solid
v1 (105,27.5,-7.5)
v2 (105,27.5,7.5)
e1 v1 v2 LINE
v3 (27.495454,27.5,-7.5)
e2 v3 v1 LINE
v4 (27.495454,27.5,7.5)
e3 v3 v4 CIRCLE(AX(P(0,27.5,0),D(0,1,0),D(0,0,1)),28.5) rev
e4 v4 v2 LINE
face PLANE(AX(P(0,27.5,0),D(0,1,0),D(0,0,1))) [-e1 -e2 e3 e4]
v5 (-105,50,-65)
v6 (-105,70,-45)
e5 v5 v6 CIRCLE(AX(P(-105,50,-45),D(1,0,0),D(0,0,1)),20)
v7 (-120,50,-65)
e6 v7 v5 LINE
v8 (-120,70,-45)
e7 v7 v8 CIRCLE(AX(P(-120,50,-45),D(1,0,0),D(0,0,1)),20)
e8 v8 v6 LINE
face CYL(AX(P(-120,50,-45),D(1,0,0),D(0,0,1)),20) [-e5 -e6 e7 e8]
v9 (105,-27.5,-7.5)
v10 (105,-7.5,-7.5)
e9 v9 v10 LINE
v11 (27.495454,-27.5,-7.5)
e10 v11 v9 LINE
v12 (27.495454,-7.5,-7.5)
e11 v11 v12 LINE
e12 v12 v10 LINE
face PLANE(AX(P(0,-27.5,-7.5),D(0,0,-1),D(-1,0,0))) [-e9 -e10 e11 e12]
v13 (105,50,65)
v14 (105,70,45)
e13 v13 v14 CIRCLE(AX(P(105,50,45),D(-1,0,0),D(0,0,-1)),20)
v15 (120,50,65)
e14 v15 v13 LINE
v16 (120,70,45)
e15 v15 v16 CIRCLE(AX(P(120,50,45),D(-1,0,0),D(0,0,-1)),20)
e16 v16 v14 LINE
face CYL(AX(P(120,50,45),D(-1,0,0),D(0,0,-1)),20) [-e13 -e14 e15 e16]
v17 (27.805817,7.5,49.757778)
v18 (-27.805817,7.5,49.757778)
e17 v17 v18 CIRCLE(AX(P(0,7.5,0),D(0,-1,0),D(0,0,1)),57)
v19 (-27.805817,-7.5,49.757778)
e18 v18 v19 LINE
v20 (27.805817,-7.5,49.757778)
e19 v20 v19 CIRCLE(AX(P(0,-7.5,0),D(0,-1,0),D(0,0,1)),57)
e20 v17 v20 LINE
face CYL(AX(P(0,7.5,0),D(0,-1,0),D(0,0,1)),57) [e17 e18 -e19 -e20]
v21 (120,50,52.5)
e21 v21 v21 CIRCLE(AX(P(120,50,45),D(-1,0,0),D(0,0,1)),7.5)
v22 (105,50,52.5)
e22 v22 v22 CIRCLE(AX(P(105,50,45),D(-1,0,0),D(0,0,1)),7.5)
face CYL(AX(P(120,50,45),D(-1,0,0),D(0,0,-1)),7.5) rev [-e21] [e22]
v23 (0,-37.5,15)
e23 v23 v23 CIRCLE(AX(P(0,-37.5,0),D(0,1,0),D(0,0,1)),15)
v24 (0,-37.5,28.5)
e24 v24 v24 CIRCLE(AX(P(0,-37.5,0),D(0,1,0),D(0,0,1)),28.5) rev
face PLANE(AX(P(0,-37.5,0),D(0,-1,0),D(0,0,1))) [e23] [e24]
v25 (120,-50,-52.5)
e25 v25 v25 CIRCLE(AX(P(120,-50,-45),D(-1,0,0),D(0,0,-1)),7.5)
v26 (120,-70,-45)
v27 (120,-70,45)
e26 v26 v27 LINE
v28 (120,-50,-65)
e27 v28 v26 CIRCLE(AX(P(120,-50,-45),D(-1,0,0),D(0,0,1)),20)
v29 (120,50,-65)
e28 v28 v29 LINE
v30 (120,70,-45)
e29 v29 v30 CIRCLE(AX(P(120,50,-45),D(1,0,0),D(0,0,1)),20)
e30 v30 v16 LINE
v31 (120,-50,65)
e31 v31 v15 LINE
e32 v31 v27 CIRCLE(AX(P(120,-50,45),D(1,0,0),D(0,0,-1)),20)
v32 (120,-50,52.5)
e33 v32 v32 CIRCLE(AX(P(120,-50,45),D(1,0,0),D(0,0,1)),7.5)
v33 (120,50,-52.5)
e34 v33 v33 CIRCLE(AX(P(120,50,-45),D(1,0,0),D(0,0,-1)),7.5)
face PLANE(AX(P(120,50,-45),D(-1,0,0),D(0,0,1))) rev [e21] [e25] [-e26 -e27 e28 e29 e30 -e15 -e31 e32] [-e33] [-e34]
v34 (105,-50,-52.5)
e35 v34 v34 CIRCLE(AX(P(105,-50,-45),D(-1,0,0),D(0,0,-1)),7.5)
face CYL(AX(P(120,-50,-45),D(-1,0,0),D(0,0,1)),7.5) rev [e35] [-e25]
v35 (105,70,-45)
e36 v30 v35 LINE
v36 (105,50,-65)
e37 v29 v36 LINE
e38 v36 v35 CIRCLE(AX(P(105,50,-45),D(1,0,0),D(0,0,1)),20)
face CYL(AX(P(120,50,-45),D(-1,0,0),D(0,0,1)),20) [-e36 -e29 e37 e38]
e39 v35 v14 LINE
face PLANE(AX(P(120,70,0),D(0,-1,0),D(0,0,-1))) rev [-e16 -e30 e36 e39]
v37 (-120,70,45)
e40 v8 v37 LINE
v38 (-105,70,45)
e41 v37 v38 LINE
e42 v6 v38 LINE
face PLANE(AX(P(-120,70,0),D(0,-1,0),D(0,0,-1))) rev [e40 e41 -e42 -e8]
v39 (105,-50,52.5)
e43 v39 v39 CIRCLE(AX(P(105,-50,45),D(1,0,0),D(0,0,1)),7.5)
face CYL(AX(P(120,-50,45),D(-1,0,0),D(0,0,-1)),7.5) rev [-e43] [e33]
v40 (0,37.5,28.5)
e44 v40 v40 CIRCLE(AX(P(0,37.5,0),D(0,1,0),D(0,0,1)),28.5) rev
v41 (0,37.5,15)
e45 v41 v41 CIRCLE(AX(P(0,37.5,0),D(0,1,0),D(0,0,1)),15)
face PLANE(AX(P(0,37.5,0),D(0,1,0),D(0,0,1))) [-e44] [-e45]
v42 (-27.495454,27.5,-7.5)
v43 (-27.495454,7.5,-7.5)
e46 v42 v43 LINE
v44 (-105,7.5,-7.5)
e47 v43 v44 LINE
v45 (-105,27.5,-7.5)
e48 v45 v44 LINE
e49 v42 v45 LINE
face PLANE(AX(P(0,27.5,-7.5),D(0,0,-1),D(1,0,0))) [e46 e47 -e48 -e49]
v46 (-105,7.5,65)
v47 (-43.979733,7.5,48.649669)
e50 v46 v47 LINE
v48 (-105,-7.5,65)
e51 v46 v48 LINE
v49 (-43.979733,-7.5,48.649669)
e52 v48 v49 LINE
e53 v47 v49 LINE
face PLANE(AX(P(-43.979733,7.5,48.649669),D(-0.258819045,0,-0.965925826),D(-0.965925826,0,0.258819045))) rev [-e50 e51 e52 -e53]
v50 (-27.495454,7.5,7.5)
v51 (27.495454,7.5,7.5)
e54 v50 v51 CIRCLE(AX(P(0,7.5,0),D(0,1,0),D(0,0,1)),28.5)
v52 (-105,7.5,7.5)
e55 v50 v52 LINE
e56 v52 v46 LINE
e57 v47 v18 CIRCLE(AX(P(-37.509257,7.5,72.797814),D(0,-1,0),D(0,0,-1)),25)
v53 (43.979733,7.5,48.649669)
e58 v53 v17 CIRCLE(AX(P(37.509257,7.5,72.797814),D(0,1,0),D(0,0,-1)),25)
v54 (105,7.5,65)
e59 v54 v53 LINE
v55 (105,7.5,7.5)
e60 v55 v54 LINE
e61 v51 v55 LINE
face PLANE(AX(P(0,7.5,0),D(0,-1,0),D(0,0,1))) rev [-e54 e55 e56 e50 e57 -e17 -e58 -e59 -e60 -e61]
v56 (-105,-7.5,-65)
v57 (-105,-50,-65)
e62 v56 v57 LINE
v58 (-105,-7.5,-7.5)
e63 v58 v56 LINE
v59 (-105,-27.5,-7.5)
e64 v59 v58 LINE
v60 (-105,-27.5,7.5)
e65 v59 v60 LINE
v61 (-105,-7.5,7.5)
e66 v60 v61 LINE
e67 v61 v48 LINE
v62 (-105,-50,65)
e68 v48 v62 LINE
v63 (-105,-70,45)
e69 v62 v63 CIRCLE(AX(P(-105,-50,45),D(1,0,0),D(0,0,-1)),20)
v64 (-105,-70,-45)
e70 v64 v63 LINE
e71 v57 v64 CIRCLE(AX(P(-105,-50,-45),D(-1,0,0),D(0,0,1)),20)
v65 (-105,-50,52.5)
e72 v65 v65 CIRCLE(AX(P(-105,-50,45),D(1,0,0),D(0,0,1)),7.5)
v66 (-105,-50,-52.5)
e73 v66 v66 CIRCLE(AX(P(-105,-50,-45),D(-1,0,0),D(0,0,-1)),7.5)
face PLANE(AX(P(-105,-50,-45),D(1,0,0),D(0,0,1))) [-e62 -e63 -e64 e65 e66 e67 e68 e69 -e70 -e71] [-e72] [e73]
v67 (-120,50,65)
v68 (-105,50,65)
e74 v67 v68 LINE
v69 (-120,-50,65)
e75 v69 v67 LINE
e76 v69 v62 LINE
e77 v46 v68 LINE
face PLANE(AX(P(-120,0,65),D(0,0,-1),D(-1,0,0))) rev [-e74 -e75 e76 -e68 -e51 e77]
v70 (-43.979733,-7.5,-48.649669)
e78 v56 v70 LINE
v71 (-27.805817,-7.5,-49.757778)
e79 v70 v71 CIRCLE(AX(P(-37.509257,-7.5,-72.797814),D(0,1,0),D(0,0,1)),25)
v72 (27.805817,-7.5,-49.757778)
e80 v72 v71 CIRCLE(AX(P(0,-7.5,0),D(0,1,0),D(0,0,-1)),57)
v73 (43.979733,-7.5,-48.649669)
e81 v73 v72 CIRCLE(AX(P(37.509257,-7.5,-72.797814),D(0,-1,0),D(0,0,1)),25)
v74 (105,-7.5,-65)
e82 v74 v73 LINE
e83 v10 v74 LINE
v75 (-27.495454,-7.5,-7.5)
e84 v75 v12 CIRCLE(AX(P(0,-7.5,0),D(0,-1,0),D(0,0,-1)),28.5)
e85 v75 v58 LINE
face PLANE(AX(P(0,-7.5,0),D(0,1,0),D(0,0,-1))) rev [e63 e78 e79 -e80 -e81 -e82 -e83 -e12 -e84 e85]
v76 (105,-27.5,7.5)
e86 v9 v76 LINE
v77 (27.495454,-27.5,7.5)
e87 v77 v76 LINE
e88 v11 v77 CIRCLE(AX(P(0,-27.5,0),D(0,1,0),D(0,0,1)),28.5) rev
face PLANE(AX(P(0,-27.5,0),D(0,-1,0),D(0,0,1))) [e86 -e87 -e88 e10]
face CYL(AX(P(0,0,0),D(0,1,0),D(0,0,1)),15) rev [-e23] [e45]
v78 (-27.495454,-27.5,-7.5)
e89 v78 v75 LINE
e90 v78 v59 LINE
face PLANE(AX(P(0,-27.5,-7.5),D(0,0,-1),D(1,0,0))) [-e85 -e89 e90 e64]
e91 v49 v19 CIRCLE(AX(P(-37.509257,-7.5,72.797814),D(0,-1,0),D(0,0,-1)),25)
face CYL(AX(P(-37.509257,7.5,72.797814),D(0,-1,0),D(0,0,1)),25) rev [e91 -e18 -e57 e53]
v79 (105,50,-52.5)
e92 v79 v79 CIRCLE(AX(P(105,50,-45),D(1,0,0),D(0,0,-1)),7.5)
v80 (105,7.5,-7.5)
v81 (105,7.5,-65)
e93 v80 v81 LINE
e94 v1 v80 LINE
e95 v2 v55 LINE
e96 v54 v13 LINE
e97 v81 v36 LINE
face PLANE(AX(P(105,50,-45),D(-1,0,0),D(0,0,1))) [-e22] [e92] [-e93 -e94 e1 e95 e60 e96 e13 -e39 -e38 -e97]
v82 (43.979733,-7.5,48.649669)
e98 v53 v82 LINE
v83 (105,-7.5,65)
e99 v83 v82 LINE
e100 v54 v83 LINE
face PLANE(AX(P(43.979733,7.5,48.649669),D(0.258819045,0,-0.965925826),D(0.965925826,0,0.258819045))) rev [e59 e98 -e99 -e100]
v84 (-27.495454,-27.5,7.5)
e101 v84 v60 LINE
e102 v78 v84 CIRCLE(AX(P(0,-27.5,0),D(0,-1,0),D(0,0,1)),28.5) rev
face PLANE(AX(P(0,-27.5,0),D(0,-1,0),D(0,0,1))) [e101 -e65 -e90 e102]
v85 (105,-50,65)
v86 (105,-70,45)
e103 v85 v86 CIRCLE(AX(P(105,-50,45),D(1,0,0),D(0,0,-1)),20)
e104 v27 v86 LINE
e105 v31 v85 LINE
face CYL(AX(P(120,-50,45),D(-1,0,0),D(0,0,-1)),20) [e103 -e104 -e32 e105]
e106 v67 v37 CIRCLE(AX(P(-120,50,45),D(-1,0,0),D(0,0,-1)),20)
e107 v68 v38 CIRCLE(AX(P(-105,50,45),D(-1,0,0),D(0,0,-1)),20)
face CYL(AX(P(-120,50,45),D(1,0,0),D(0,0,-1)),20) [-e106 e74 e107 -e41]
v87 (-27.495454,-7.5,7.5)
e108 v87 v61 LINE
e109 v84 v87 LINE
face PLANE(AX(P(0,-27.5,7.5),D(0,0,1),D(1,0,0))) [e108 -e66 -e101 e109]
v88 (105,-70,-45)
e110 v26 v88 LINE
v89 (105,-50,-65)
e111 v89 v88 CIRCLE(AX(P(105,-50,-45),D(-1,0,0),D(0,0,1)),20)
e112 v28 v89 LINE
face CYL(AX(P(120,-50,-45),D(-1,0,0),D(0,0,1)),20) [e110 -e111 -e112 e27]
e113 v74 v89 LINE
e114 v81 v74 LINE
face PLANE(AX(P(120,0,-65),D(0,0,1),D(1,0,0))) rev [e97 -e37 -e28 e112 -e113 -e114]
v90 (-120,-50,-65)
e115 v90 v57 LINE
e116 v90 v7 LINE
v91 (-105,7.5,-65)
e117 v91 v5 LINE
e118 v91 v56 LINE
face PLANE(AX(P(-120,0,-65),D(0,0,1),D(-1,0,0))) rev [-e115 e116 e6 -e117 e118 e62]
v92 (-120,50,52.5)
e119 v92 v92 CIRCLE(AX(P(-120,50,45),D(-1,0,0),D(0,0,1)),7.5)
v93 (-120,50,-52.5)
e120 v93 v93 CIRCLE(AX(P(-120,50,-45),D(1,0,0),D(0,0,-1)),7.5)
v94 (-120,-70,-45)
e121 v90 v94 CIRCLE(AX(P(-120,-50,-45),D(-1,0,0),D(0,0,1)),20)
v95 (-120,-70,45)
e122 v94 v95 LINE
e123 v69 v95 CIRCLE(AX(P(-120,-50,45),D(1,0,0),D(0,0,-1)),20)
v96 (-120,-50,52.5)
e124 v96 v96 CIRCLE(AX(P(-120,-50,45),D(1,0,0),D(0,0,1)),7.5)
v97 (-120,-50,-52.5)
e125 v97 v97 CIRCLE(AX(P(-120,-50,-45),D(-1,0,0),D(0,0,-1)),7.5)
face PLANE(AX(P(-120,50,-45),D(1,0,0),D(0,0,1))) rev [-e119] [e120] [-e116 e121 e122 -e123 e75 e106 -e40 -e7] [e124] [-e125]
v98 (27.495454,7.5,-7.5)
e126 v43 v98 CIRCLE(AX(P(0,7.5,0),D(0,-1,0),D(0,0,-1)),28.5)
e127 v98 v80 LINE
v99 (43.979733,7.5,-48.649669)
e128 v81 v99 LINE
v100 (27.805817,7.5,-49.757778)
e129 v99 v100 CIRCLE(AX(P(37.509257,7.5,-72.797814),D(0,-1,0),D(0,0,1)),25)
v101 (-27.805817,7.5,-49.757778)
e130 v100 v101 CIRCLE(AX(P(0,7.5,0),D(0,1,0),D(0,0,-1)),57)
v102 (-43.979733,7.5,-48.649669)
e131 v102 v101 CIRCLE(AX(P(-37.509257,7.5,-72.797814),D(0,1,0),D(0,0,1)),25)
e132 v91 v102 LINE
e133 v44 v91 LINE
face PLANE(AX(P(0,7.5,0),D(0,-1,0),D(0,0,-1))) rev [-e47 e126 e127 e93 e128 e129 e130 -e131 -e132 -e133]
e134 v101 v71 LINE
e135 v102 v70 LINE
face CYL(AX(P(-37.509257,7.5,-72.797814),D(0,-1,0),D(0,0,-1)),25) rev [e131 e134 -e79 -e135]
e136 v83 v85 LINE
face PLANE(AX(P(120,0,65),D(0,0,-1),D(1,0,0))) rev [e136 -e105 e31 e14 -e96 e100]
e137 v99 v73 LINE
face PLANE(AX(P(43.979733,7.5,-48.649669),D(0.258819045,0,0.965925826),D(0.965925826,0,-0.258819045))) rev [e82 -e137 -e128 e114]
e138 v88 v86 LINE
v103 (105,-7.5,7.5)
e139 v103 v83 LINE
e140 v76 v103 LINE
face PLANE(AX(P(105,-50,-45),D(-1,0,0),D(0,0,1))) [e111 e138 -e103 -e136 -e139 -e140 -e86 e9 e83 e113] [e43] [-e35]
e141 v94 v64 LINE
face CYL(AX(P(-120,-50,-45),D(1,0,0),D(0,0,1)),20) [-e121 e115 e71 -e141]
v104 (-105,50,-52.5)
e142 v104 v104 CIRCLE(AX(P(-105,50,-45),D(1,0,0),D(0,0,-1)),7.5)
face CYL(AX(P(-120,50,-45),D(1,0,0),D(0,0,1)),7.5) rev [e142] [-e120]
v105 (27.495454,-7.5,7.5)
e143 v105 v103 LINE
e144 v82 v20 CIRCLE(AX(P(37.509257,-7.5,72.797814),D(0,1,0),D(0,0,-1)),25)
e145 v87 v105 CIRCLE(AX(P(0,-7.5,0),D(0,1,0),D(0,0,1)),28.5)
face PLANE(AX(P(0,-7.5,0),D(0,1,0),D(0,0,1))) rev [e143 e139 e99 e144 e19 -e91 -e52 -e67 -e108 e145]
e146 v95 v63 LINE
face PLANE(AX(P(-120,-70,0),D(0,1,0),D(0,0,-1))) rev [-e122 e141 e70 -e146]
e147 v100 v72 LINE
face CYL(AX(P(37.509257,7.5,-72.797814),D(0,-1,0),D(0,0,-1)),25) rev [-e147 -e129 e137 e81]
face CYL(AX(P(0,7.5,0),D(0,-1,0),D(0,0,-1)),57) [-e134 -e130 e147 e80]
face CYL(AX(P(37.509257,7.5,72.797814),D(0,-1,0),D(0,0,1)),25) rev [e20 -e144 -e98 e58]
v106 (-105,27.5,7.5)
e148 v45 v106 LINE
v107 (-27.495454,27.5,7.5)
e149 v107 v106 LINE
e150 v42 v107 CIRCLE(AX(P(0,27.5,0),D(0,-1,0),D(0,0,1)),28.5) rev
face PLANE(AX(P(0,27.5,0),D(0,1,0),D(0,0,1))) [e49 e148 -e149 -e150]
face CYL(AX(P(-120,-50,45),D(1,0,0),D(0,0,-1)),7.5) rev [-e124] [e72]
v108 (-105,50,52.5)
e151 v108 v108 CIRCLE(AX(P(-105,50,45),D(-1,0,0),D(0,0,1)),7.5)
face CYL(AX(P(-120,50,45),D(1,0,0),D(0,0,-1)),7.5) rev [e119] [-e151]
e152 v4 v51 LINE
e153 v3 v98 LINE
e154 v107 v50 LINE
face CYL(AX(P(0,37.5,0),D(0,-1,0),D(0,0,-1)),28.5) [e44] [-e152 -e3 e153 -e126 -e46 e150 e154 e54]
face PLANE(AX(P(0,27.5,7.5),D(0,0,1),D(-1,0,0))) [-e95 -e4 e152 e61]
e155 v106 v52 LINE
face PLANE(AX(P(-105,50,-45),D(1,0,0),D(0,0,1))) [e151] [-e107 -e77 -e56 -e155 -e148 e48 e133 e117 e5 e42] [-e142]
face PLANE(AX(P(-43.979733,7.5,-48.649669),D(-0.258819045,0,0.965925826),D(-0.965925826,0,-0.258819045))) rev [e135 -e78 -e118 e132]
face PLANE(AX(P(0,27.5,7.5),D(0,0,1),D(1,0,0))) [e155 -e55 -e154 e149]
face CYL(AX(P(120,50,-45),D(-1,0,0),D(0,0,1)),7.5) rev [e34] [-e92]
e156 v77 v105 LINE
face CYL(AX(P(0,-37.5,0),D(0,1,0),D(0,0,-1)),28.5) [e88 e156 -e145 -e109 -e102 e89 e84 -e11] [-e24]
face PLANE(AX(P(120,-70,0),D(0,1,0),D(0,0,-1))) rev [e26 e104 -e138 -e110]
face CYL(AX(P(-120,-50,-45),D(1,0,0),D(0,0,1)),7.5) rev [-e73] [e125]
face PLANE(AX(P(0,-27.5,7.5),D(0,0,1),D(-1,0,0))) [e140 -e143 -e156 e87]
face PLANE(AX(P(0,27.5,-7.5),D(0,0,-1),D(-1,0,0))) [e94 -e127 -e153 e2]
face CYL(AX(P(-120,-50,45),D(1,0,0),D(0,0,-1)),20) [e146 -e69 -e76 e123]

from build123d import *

# Parameters (mm, degrees)
BOSS_EXTRUDE1_DEPTH   = 7.5
CUT_EXTRUDE1_DEPTH    = 124.718430317
BOSS_EXTRUDE2_START   = 37.5
BOSS_EXTRUDE2_DEPTH   = 37.5
BOSS_EXTRUDE3_START   = 27.5
BOSS_EXTRUDE3_DEPTH   = 27.5
SKETCH4_R             = 7.5
BOSS_EXTRUDE4_DEPTH   = 15
MIRROR1_DEPTH         = 27.5
MIRROR1_2_DEPTH       = 7.5
MIRROR1_START         = 27.5
MIRROR1_3_OUTLINE_W   = 15
MIRROR1_3_OUTLINE_H   = 130
MIRROR1_3_OUTLINE_H_2 = 65
MIRROR1_3_DEPTH       = 14.9999999
MIRROR1_4_DEPTH       = 10
MIRROR1_START_2       = -120
MIRROR1_5_OUTLINE_R   = 7.5
MIRROR1_5_DEPTH       = 15
MIRROR1_START_3       = 105
MIRROR1_6_OUTLINE_R   = 7.5
MIRROR1_6_DEPTH       = 15


with BuildPart() as part:
    # Sketch1 → Boss-Extrude1 (new body)
    with BuildSketch(Plane(origin=(0, 0, 0), x_dir=(1, 0, 0), z_dir=(0, 1, 0))):
        with BuildLine():
            Line((43.979733232, 48.649668798), (105, 65))
            Line((105, 65), (105, 0))
            Line((105, 0), (0, 0))
            Line((0, 0), (0, 57))
            ThreePointArc((0, 57), (14.366743308, 55.159737914), (27.805817387, 49.757778482))
            ThreePointArc((27.805817387, 49.757778482), (35.800459234, 47.856282629), (43.979733232, 48.649668798))
        make_face()
    extrude(amount=BOSS_EXTRUDE1_DEPTH)

    # Sketch2 → Cut-Extrude1 (cut, through all)
    with BuildSketch(Plane(origin=(0, 7.5, 0), x_dir=(1, 0, 0), z_dir=(0, 1, 0))):
        with BuildLine():
            Line((0, 15), (0, 0))
            Line((0, 0), (15, 0))
            ThreePointArc((15, 0), (10.606601718, 10.606601718), (0, 15))
        make_face()
    extrude(amount=-CUT_EXTRUDE1_DEPTH, mode=Mode.SUBTRACT)

    # Sketch3 → Boss-Extrude2 (add)
    with BuildSketch(Plane(origin=(0, 0, 0), x_dir=(1, 0, 0), z_dir=(0, 1, 0)).offset(BOSS_EXTRUDE2_START)):
        with BuildLine():
            ThreePointArc((28.5, 0), (28.247747201, 3.783487555), (27.49545417, 7.5))
            ThreePointArc((27.49545417, 7.5), (17.298843892, 22.649503306), (0, 28.5))
            Line((0, 28.5), (0, 15))
            ThreePointArc((0, 15), (10.606601718, 10.606601718), (15, 0))
            Line((15, 0), (28.5, 0))
        make_face()
    extrude(amount=-BOSS_EXTRUDE2_DEPTH)

    # Sketch3<4> → Boss-Extrude3 (add)
    with BuildSketch(Plane(origin=(0, 0, 0), x_dir=(1, 0, 0), z_dir=(0, 1, 0)).offset(BOSS_EXTRUDE3_START)):
        with BuildLine():
            Line((105, 7.5), (27.49545417, 7.5))
            ThreePointArc((27.49545417, 7.5), (28.247747201, 3.783487555), (28.5, 0))
            Line((28.5, 0), (105, 0))
            Line((105, 0), (105, 7.5))
        make_face()
    extrude(amount=-BOSS_EXTRUDE3_DEPTH)

    # Sketch4 → Boss-Extrude4 (add)
    with BuildSketch(Plane(origin=(105, 0, 0), x_dir=(0, 0, -1), z_dir=(1, 0, 0))):
        with BuildLine():
            Line((0, 0), (65, 0))
            Line((65, 0), (65, 50))
            ThreePointArc((65, 50), (59.142135624, 64.142135624), (45, 70))
            Line((45, 70), (0, 70))
            Line((0, 70), (0, 0))
        make_face()
        with Locations((45, 50)):
            Circle(SKETCH4_R, mode=Mode.SUBTRACT)
    extrude(amount=BOSS_EXTRUDE4_DEPTH)

    # Mirror1: read off the stored shape, not the designer's step
    # Mirror1 outline → Mirror1 (add)
    with BuildSketch(Plane(origin=(0, 0, 0), x_dir=(1, 0, 0), z_dir=(0, 1, 0))):
        with BuildLine():
            Line((0, 15), (0, 28.5))
            ThreePointArc((0, 28.5), (-17.298843892, 22.649503306), (-27.49545417, 7.5))
            Line((-27.49545417, 7.5), (-105, 7.5))
            Line((-105, 7.5), (-105, 65))
            Line((-105, 65), (-120, 65))
            Line((-120, 65), (-120, -65))
            Line((-120, -65), (-105, -65))
            Line((-105, -65), (-105, -7.5))
            Line((-105, -7.5), (-27.49545417, -7.5))
            ThreePointArc((-27.49545417, -7.5), (0, -28.5), (27.49545417, -7.5))
            Line((27.49545417, -7.5), (105, -7.5))
            Line((105, -7.5), (105, -65))
            Line((105, -65), (120, -65))
            Line((120, -65), (120, 0))
            Line((120, 0), (15, 0))
            ThreePointArc((15, 0), (-10.606601718, -10.606601718), (0, 15))
        make_face()
    extrude(amount=MIRROR1_DEPTH)

    # Mirror1 2 outline → Mirror1 2 (add)
    with BuildSketch(Plane(origin=(0, 0, 0), x_dir=(1, 0, 0), z_dir=(0, 1, 0))):
        with BuildLine():
            ThreePointArc((0, 57), (-14.366743308, 55.159737914), (-27.805817387, 49.757778482))
            ThreePointArc((-27.805817387, 49.757778482), (-35.800459234, 47.856282629), (-43.979733232, 48.649668798))
            Line((-43.979733232, 48.649668798), (-105, 65))
            Line((-105, 65), (-105, 7.5))
            Line((-105, 7.5), (-27.49545417, 7.5))
            ThreePointArc((-27.49545417, 7.5), (-17.298843892, 22.649503306), (0, 28.5))
            Line((0, 28.5), (0, 57))
        make_face()
        with BuildLine():
            Line((105, -7.5), (27.49545417, -7.5))
            ThreePointArc((27.49545417, -7.5), (0, -28.5), (-27.49545417, -7.5))
            Line((-27.49545417, -7.5), (-105, -7.5))
            Line((-105, -7.5), (-105, -65))
            Line((-105, -65), (-43.979733232, -48.649668798))
            ThreePointArc((-43.979733232, -48.649668798), (-35.800459234, -47.856282629), (-27.805817387, -49.757778482))
            ThreePointArc((-27.805817387, -49.757778482), (0, -57), (27.805817387, -49.757778482))
            ThreePointArc((27.805817387, -49.757778482), (35.800459234, -47.856282629), (43.979733232, -48.649668798))
            Line((43.979733232, -48.649668798), (105, -65))
            Line((105, -65), (105, -7.5))
        make_face()
    extrude(amount=MIRROR1_2_DEPTH)

    # Mirror1 3 outline → Mirror1 3 (add)
    with BuildSketch(Plane(origin=(0, 0, 0), x_dir=(1, 0, 0), z_dir=(0, 1, 0)).offset(MIRROR1_START)):
        with Locations((-112.5, 0)):
            Rectangle(MIRROR1_3_OUTLINE_W, MIRROR1_3_OUTLINE_H)
        with Locations((112.5, -32.5)):
            Rectangle(MIRROR1_3_OUTLINE_W, MIRROR1_3_OUTLINE_H_2)
    extrude(amount=MIRROR1_3_DEPTH)

    # Mirror1 4 outline → Mirror1 4 (add)
    with BuildSketch(Plane(origin=(0, 0, 0), x_dir=(1, 0, 0), z_dir=(0, 1, 0)).offset(MIRROR1_START)):
        with BuildLine():
            Line((0, 15), (0, 28.5))
            ThreePointArc((0, 28.5), (-20.152543264, -20.152543264), (28.5, 0))
            Line((28.5, 0), (15, 0))
            ThreePointArc((15, 0), (-10.606601718, -10.606601718), (0, 15))
        make_face()
    extrude(amount=MIRROR1_4_DEPTH)

    # Mirror1 5 outline → Mirror1 5 (add)
    with BuildSketch(Plane.YZ.offset(MIRROR1_START_2)):
        with BuildLine():
            Line((7.5, -7.5), (7.5, -65))
            Line((7.5, -65), (50, -65))
            ThreePointArc((50, -65), (64.142135624, -59.142135624), (70, -45))
            Line((70, -45), (70, 45))
            ThreePointArc((70, 45), (64.142135624, 59.142135624), (50, 65))
            Line((50, 65), (7.5, 65))
            Line((7.5, 65), (7.5, 7.5))
            Line((7.5, 7.5), (27.5, 7.5))
            Line((27.5, 7.5), (27.5, -7.5))
            Line((27.5, -7.5), (7.5, -7.5))
        make_face()
        with Locations((50, -45)):
            Circle(MIRROR1_5_OUTLINE_R, mode=Mode.SUBTRACT)
        with Locations((50, 45)):
            Circle(MIRROR1_5_OUTLINE_R, mode=Mode.SUBTRACT)
    extrude(amount=MIRROR1_5_DEPTH)

    # Mirror1 6 outline → Mirror1 6 (add)
    with BuildSketch(Plane.YZ.offset(MIRROR1_START_3)):
        with BuildLine():
            Line((7.5, -7.5), (7.5, -65))
            Line((7.5, -65), (50, -65))
            ThreePointArc((50, -65), (64.142135624, -59.142135624), (70, -45))
            Line((70, -45), (70, 45))
            ThreePointArc((70, 45), (64.142135624, 59.142135624), (50, 65))
            Line((50, 65), (7.5, 65))
            Line((7.5, 65), (7.5, 7.5))
            Line((7.5, 7.5), (27.5, 7.5))
            Line((27.5, 7.5), (27.5, -7.5))
            Line((27.5, -7.5), (7.5, -7.5))
        make_face()
        with Locations((50, -45)):
            Circle(MIRROR1_6_OUTLINE_R, mode=Mode.SUBTRACT)
        with Locations((50, 45)):
            Circle(MIRROR1_6_OUTLINE_R, mode=Mode.SUBTRACT)
    extrude(amount=MIRROR1_6_DEPTH)

    # Mirror2: part across face


with BuildPart() as part_1:
    add(part.part)
    add(part.part.mirror(Plane(origin=(0, 0, 0), x_dir=(0, 0, 1), z_dir=(0, -1, 0))))


solid = part_1.part
